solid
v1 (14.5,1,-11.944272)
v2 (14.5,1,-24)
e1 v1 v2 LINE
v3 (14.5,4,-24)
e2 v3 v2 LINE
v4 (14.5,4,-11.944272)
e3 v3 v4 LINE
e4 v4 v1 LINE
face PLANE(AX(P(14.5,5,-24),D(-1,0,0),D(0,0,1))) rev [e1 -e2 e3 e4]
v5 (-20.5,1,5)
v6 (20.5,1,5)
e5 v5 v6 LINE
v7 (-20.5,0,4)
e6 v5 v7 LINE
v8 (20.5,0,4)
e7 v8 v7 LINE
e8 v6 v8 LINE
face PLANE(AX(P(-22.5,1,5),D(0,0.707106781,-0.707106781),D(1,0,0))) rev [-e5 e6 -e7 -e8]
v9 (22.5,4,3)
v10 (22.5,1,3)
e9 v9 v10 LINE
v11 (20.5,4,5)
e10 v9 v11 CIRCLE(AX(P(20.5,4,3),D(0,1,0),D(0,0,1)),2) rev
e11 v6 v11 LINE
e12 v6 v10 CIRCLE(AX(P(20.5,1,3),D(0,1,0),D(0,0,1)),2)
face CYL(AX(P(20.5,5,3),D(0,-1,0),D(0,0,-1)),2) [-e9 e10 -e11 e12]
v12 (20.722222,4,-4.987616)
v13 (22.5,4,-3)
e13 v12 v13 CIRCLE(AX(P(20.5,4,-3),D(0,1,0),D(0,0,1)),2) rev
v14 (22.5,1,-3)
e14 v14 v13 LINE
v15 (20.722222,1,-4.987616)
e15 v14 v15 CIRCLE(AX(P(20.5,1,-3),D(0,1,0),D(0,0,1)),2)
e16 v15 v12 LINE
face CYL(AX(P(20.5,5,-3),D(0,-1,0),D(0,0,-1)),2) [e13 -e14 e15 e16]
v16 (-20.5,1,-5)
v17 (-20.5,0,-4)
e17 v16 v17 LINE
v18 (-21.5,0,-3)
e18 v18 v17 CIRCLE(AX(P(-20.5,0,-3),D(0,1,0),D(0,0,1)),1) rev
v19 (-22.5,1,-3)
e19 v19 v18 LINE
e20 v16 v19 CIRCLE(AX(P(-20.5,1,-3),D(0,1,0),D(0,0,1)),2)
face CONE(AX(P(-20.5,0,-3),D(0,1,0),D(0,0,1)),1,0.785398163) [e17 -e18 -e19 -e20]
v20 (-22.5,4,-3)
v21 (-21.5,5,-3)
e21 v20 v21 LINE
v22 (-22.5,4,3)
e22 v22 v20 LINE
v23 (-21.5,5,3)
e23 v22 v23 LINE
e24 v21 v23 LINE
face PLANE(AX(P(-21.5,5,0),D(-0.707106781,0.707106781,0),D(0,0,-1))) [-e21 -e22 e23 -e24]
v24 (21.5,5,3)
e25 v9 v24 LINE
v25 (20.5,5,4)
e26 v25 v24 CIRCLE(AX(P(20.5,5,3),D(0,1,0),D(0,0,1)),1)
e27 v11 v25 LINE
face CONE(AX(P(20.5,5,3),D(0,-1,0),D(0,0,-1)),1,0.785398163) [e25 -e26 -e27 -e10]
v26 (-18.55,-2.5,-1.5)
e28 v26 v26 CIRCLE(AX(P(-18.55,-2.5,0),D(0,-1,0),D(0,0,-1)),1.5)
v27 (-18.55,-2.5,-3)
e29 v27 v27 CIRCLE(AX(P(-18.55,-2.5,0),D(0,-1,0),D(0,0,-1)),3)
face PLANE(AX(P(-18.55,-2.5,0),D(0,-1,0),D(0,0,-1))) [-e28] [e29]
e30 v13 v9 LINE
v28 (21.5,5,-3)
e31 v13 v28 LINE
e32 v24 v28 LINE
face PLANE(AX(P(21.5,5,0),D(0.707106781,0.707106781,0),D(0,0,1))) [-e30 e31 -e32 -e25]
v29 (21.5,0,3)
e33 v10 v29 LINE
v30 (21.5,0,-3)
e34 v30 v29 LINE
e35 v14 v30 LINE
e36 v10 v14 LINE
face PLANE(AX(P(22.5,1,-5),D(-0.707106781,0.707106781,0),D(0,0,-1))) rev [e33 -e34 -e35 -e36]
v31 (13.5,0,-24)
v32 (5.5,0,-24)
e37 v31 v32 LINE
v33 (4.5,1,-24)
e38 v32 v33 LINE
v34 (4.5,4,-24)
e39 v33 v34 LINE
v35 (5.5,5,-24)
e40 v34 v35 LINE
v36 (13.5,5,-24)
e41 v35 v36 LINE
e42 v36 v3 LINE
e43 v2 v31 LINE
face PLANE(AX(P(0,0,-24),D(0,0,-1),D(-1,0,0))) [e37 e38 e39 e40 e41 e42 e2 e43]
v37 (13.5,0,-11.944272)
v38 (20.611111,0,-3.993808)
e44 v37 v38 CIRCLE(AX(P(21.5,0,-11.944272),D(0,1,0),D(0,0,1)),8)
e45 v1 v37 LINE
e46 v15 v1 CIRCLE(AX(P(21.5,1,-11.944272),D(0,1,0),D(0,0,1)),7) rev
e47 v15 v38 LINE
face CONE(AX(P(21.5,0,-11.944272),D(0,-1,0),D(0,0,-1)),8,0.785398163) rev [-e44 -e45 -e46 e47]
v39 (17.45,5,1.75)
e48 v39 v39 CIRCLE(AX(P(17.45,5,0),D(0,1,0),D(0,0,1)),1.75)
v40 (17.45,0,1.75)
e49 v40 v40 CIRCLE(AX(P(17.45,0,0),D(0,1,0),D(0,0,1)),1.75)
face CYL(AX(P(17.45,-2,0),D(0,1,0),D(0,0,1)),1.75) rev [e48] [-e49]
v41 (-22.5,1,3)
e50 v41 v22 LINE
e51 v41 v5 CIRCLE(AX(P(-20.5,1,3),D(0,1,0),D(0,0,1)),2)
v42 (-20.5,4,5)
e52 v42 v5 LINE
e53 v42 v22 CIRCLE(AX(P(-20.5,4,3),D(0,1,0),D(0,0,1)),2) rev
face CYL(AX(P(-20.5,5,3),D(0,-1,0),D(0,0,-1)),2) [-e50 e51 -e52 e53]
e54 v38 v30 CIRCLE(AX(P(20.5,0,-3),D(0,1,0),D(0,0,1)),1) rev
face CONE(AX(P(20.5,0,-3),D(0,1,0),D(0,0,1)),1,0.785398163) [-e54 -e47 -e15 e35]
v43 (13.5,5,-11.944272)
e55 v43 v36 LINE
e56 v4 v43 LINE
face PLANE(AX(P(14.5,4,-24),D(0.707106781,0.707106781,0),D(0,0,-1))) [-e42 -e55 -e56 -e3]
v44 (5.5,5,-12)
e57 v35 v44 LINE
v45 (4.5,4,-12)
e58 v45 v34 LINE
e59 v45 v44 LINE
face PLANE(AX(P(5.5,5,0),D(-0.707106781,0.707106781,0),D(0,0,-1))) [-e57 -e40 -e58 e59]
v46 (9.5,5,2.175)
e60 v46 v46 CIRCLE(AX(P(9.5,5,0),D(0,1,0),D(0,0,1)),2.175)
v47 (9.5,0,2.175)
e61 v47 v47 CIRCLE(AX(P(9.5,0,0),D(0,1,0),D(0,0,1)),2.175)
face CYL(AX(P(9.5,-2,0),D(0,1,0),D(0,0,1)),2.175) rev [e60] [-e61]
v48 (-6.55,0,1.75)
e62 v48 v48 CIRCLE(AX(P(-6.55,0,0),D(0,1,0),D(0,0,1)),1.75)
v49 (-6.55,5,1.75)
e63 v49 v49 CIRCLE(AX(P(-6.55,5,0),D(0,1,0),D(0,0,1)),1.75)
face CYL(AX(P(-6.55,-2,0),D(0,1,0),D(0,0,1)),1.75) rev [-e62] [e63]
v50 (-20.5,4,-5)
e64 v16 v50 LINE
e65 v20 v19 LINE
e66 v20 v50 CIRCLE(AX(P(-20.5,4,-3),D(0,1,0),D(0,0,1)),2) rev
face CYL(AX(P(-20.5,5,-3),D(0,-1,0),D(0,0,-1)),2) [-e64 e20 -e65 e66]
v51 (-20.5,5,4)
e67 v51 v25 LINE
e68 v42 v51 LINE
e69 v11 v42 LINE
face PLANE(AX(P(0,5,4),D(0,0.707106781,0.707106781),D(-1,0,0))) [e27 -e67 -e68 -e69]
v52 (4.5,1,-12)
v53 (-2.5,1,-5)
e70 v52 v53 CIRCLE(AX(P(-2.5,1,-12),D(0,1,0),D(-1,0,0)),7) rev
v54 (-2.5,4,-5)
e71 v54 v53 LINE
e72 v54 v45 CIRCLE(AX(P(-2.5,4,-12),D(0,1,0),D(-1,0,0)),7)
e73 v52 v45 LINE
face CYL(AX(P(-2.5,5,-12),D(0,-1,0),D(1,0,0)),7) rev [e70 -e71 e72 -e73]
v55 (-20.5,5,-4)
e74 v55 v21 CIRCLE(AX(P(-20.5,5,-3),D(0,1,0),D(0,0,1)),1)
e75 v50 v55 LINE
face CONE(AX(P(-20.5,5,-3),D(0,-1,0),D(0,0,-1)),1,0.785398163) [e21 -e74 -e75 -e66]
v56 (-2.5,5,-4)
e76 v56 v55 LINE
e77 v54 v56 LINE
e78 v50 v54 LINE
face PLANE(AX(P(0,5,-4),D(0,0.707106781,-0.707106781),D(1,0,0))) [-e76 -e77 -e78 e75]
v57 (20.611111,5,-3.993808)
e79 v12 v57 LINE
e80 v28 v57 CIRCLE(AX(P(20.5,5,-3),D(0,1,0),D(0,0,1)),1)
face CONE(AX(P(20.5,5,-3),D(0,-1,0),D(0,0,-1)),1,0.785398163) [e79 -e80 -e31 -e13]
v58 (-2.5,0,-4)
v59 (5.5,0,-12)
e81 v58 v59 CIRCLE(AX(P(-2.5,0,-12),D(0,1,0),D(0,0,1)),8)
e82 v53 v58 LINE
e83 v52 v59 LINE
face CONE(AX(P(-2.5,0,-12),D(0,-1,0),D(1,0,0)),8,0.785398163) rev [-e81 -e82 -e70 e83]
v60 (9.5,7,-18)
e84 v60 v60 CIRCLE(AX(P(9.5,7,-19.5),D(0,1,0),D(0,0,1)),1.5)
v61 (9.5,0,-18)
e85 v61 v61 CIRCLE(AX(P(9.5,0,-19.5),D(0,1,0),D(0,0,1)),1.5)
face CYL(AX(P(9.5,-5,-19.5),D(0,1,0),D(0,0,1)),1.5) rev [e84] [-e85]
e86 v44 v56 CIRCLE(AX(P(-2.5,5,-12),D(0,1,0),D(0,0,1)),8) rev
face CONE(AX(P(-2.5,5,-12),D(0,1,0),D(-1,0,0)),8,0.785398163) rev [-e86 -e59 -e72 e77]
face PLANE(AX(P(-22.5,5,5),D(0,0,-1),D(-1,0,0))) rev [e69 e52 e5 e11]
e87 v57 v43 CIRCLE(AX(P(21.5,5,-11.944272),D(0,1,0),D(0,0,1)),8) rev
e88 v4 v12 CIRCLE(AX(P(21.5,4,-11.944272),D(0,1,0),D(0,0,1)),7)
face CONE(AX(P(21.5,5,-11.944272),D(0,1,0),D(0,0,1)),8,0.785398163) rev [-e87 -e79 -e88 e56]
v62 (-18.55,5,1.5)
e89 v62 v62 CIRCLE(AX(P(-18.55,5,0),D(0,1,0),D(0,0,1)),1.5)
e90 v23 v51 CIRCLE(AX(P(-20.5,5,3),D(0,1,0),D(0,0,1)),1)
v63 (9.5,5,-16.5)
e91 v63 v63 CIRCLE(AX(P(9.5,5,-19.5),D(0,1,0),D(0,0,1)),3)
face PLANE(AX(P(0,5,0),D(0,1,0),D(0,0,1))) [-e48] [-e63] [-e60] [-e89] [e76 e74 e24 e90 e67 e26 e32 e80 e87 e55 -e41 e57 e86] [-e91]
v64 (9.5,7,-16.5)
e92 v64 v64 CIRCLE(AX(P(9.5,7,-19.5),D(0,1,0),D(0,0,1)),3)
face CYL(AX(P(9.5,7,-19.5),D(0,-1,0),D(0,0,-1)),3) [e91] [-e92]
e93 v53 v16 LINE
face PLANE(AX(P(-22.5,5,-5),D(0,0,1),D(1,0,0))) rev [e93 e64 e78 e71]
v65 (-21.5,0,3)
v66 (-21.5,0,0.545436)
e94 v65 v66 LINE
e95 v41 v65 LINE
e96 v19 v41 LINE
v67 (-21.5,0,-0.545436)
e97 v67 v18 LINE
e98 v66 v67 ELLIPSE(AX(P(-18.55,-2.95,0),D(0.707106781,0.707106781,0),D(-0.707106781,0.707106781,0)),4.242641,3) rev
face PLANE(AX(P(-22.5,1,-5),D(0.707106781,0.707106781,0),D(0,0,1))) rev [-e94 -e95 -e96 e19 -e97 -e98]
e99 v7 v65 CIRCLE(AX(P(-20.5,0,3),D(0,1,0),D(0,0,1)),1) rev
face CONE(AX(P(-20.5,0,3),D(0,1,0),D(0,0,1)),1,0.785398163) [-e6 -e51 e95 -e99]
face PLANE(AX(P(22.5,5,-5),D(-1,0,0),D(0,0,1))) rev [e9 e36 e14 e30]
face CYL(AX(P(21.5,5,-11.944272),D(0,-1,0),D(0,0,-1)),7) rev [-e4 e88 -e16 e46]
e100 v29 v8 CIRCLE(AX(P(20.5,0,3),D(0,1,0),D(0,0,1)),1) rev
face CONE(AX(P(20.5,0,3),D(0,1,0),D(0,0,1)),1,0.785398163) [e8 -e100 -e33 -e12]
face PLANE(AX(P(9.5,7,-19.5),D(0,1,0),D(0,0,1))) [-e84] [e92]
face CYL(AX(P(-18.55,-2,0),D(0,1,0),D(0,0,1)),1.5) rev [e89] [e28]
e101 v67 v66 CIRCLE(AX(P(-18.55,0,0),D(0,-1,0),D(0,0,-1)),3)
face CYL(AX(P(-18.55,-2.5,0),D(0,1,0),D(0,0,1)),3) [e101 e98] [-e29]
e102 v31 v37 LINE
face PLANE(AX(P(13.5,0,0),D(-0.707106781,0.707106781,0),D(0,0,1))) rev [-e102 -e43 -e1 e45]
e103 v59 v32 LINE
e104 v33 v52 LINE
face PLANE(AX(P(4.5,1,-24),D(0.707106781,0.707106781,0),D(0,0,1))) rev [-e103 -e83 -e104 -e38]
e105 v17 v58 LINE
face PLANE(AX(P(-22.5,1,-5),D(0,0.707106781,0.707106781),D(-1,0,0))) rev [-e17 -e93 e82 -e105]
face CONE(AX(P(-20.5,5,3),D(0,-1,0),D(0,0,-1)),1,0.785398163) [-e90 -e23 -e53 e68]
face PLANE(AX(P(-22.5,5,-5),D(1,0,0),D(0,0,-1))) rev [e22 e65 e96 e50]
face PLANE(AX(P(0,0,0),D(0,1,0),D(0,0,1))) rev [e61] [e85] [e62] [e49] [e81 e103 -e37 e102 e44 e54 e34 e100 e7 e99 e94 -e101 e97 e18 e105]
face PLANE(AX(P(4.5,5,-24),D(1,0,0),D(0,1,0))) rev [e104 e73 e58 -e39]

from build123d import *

# Parameters (mm, degrees)
SKETCH1_W           = 45
SKETCH1_H           = 10
BOSS_EXTRUDE1_DEPTH = 5
SKETCH3_R           = 1.5
SKETCH3_R_2         = 2.175
SKETCH3_R_3         = 1.75
CUT_EXTRUDE1_DEPTH  = 7
FILLET1_R           = 2
SKETCH4_R           = 3
SKETCH4_R_2         = 1.5
BOSS_EXTRUDE2_DEPTH = 2.5
SKETCH5_W           = 10
SKETCH5_H           = 5
BOSS_EXTRUDE3_DEPTH = 19
SKETCH6_R           = 1.5
CUT_EXTRUDE2_DEPTH  = 10
BOSS_EXTRUDE4_START = 2
SKETCH7_R           = 3
SKETCH7_R_2         = 1.5
BOSS_EXTRUDE4_DEPTH = 2
FILLET2_R           = 7
CHAMFER1_SIZE       = 1


with BuildPart() as part:
    # Sketch1 → Boss-Extrude1 (new body)
    with BuildSketch(Plane(origin=(0, 0, 0), x_dir=(1, 0, 0), z_dir=(0, 1, 0))):
        Rectangle(SKETCH1_W, SKETCH1_H)
    extrude(amount=BOSS_EXTRUDE1_DEPTH)

    # Sketch3 → Cut-Extrude1 (cut)
    with BuildSketch(Plane(origin=(0, 5, 0), x_dir=(1, 0, 0), z_dir=(0, 1, 0))):
        with Locations(Location((-18.55, 0, 0), (0, 0, 270))):
            Circle(SKETCH3_R)
        with Locations(Location((9.5, 0, 0), (0, 0, 270))):
            Circle(SKETCH3_R_2)
        with Locations(Location((-6.55, 0, 0), (0, 0, 270))):
            Circle(SKETCH3_R_3)
        with Locations(Location((17.45, 0, 0), (0, 0, 270))):
            Circle(SKETCH3_R_3)
    extrude(amount=-CUT_EXTRUDE1_DEPTH, mode=Mode.SUBTRACT)

    # Fillet1
    fillet1_edges = [part.edges().sort_by_distance(p)[0] for p in [
        (22.5, 2.5, 5),
        (-22.5, 2.5, 5),
        (-22.5, 2.5, -5),
        (22.5, 2.5, -5),
    ]]
    fillet(fillet1_edges, radius=FILLET1_R)

    # Sketch4 → Boss-Extrude2 (add)
    with BuildSketch(Plane.XZ):
        with Locations(Location((-18.55, 0, 0), (0, 0, 270))):
            Circle(SKETCH4_R)
        with Locations(Location((-18.55, 0, 0), (0, 0, 90))):
            Circle(SKETCH4_R_2, mode=Mode.SUBTRACT)
    extrude(amount=BOSS_EXTRUDE2_DEPTH)

    # Sketch5 → Boss-Extrude3 (add)
    with BuildSketch(Plane(origin=(0, 0, -5), x_dir=(-1, 0, 0), z_dir=(0, 0, -1))):
        with Locations((-9.5, 2.5)):
            Rectangle(SKETCH5_W, SKETCH5_H)
    extrude(amount=BOSS_EXTRUDE3_DEPTH)

    # Sketch6 → Cut-Extrude2 (cut)
    with BuildSketch(Plane(origin=(0, 5, 0), x_dir=(1, 0, 0), z_dir=(0, 1, 0))):
        with Locations(Location((9.5, 19.5, 0), (0, 0, 270))):
            Circle(SKETCH6_R)
    extrude(amount=-CUT_EXTRUDE2_DEPTH, mode=Mode.SUBTRACT)

    # Sketch7 → Boss-Extrude4 (add)
    with BuildSketch(Plane(origin=(0, 5, 0), x_dir=(1, 0, 0), z_dir=(0, 1, 0)).offset(BOSS_EXTRUDE4_START)):
        with Locations(Location((9.5, 19.5, 0), (0, 0, 270))):
            Circle(SKETCH7_R)
        with Locations(Location((9.5, 19.5, 0), (0, 0, 270))):
            Circle(SKETCH7_R_2, mode=Mode.SUBTRACT)
    extrude(amount=-BOSS_EXTRUDE4_DEPTH)

    # Fillet2
    fillet2_edges = [part.edges().sort_by_distance(p)[0] for p in [
        (4.5, 2.5, -5),
        (14.5, 2.5, -5),
    ]]
    fillet(fillet2_edges, radius=FILLET2_R)

    # Chamfer1
    # the kernel refuses this chamfer: 1 mm, written as the material it takes off along each edge
    with BuildSketch(Plane(origin=(-20.5, 0, -5), x_dir=(0, 1, 0), z_dir=(1, 0, 0))) as chamfer1_piece_1:
        Polygon((CHAMFER1_SIZE, 0), (0, CHAMFER1_SIZE), (0, 0), align=None)
    extrude(amount=18, mode=Mode.SUBTRACT)
    with BuildSketch(Plane(origin=(-20.5, 5, -5), x_dir=(0, -1, 0), z_dir=(1, 0, 0))) as chamfer1_piece_2:
        Polygon((CHAMFER1_SIZE, 0), (0, -CHAMFER1_SIZE), (0, 0), align=None)
    extrude(amount=18, mode=Mode.SUBTRACT)
    with BuildSketch(Plane(origin=(20.5, 0, -3), x_dir=(0.11111111111111072, 0, -0.9938079899999066), z_dir=(-0.9938079899999066, 0, -0.11111111111111072))) as chamfer1_piece_3:
        Polygon((2 - CHAMFER1_SIZE, 0), (2, -CHAMFER1_SIZE), (2, 0), align=None)
    revolve(axis=Axis((20.5, 0, -3), (0, -1, 0)), revolution_arc=83.620629792, mode=Mode.SUBTRACT)
    with BuildSketch(Plane(origin=(-2.5, 5, -12), x_dir=(0, 0, 1), z_dir=(-1, 0, 0))) as chamfer1_piece_4:
        Polygon((7, -CHAMFER1_SIZE), (7 + CHAMFER1_SIZE, 0), (7, 0), align=None)
    revolve(axis=Axis((-2.5, 5, -12), (0, 1, 0)), revolution_arc=90, mode=Mode.SUBTRACT)
    with BuildSketch(Plane(origin=(-2.5, 0, -12), x_dir=(0, 0, 1), z_dir=(-1, 0, 0))) as chamfer1_piece_5:
        Polygon((7 + CHAMFER1_SIZE, 0), (7, CHAMFER1_SIZE), (7, 0), align=None)
    revolve(axis=Axis((-2.5, 0, -12), (0, 1, 0)), revolution_arc=90, mode=Mode.SUBTRACT)
    with BuildSketch(Plane(origin=(21.499999975, 0, -11.944271843), x_dir=(-0.11111110870133047, 0, 0.9938079902693282), z_dir=(0.9938079902693282, 0, 0.11111110870133047))) as chamfer1_piece_6:
        Polygon((6.999999931 + CHAMFER1_SIZE, 0), (6.999999931 + CHAMFER1_SIZE * 6.29164365051e-09, -CHAMFER1_SIZE), (6.999999931, 0), align=None)
    revolve(axis=Axis((21.499999975, 0, -11.944271843), (0, -1, 0)), revolution_arc=83.620630478, mode=Mode.SUBTRACT)
    with BuildSketch(Plane(origin=(21.499999975, 5, -11.944271843), x_dir=(-0.11111110870132958, 0, 0.9938079902693283), z_dir=(0.9938079902693283, 0, 0.11111110870132958))) as chamfer1_piece_7:
        Polygon((6.999999931 + CHAMFER1_SIZE, 0), (6.999999931 + CHAMFER1_SIZE * 6.2916400978e-09, CHAMFER1_SIZE), (6.999999931, 0), align=None)
    revolve(axis=Axis((21.499999975, 5, -11.944271843), (0, -1, 0)), revolution_arc=83.620630478, mode=Mode.SUBTRACT)
    with BuildSketch(Plane(origin=(22.5, 0, -3), x_dir=(-1, 0, 0), z_dir=(0, 0, 1))) as chamfer1_piece_8:
        Polygon((CHAMFER1_SIZE, 0), (0, -CHAMFER1_SIZE), (0, 0), align=None)
    extrude(amount=6, mode=Mode.SUBTRACT)
    with BuildSketch(Plane(origin=(20.5, 0, 5), x_dir=(0, 0, -1), z_dir=(-1, 0, 0))) as chamfer1_piece_9:
        Polygon((CHAMFER1_SIZE, 0), (0, -CHAMFER1_SIZE), (0, 0), align=None)
    extrude(amount=41, mode=Mode.SUBTRACT)
    with BuildSketch(Plane(origin=(-22.5, 0, 3), x_dir=(1, 0, 0), z_dir=(0, 0, -1))) as chamfer1_piece_10_section:
        Polygon((CHAMFER1_SIZE, 0), (0, -CHAMFER1_SIZE), (0, 0), align=None)
    chamfer1_piece_10 = extrude(amount=6, mode=Mode.PRIVATE)
    chamfer1_piece_10 = chamfer1_piece_10 - Plane(origin=(-18.55, 0, 0), x_dir=(0, 0, -1), z_dir=(0, 1, 0)) * Cylinder(3, 16, mode=Mode.PRIVATE)
    add(chamfer1_piece_10, mode=Mode.SUBTRACT)
    with BuildSketch(Plane(origin=(-20.5, 0, 3), x_dir=(-1, 0, 0), z_dir=(0, 0, -1))) as chamfer1_piece_11:
        Polygon((2 - CHAMFER1_SIZE, 0), (2, CHAMFER1_SIZE), (2, 0), align=None)
    revolve(axis=Axis((-20.5, 0, 3), (0, 1, 0)), revolution_arc=90, mode=Mode.SUBTRACT)
    with BuildSketch(Plane(origin=(20.5, 0, 3), x_dir=(1, 0, 0), z_dir=(0, 0, -1))) as chamfer1_piece_12:
        Polygon((2 - CHAMFER1_SIZE, 0), (2, -CHAMFER1_SIZE), (2, 0), align=None)
    revolve(axis=Axis((20.5, 0, 3), (0, -1, 0)), revolution_arc=90, mode=Mode.SUBTRACT)
    with BuildSketch(Plane(origin=(-20.5, 0, -3), x_dir=(0, 0, -1), z_dir=(1, 0, 0))) as chamfer1_piece_13:
        Polygon((2 - CHAMFER1_SIZE, 0), (2, CHAMFER1_SIZE), (2, 0), align=None)
    revolve(axis=Axis((-20.5, 0, -3), (0, 1, 0)), revolution_arc=90, mode=Mode.SUBTRACT)
    with BuildSketch(Plane(origin=(22.5, 5, -3), x_dir=(-1, 0, 0), z_dir=(0, 0, 1)), Plane(origin=(-22.5, 5, 3), x_dir=(1, 0, 0), z_dir=(0, 0, -1))) as chamfer1_piece_14:
        Polygon((CHAMFER1_SIZE, 0), (0, CHAMFER1_SIZE), (0, 0), align=None)
    extrude(amount=6, mode=Mode.SUBTRACT)
    with BuildSketch(Plane(origin=(20.5, 5, 5), x_dir=(0, 0, -1), z_dir=(-1, 0, 0))) as chamfer1_piece_15:
        Polygon((CHAMFER1_SIZE, 0), (0, CHAMFER1_SIZE), (0, 0), align=None)
    extrude(amount=41, mode=Mode.SUBTRACT)
    with BuildSketch(Plane(origin=(-20.5, 5, 3), x_dir=(-1, 0, 0), z_dir=(0, 0, -1))) as chamfer1_piece_16:
        Polygon((2 - CHAMFER1_SIZE, 0), (2, -CHAMFER1_SIZE), (2, 0), align=None)
    revolve(axis=Axis((-20.5, 5, 3), (0, 1, 0)), revolution_arc=90, mode=Mode.SUBTRACT)
    with BuildSketch(Plane(origin=(20.5, 5, 3), x_dir=(1, 0, 0), z_dir=(0, 0, -1))) as chamfer1_piece_17:
        Polygon((2 - CHAMFER1_SIZE, 0), (2, CHAMFER1_SIZE), (2, 0), align=None)
    revolve(axis=Axis((20.5, 5, 3), (0, -1, 0)), revolution_arc=90, mode=Mode.SUBTRACT)
    with BuildSketch(Plane(origin=(-20.5, 5, -3), x_dir=(0, 0, -1), z_dir=(1, 0, 0))) as chamfer1_piece_18:
        Polygon((2, -CHAMFER1_SIZE), (2 - CHAMFER1_SIZE, 0), (2, 0), align=None)
    revolve(axis=Axis((-20.5, 5, -3), (0, 1, 0)), revolution_arc=90, mode=Mode.SUBTRACT)
    with BuildSketch(Plane(origin=(20.5, 5, -3), x_dir=(0.11111111111111072, 0, -0.9938079899999066), z_dir=(-0.9938079899999066, 0, -0.11111111111111072))) as chamfer1_piece_19:
        Polygon((2 - CHAMFER1_SIZE, 0), (2, CHAMFER1_SIZE), (2, 0), align=None)
    revolve(axis=Axis((20.5, 5, -3), (0, -1, 0)), revolution_arc=83.620629792, mode=Mode.SUBTRACT)
    with BuildSketch(Plane(origin=(14.5, 5, -11.94427191), x_dir=(-1, 0, 0), z_dir=(0, 0, -1))) as chamfer1_piece_20:
        Polygon((CHAMFER1_SIZE, 0), (0, -CHAMFER1_SIZE), (0, 0), align=None)
    extrude(amount=14.627411078, mode=Mode.SUBTRACT)
    with BuildSketch(Plane(origin=(14.5, 0, -11.94427191), x_dir=(-1, 0, 0), z_dir=(0, 0, -1))) as chamfer1_piece_21:
        Polygon((CHAMFER1_SIZE, 0), (0, CHAMFER1_SIZE), (0, 0), align=None)
    extrude(amount=14.627411078, mode=Mode.SUBTRACT)
    with BuildSketch(Plane(origin=(4.5, 0, -12), x_dir=(1, 0, 0), z_dir=(0, 0, -1))) as chamfer1_piece_22:
        Polygon((CHAMFER1_SIZE, 0), (0, -CHAMFER1_SIZE), (0, 0), align=None)
    extrude(amount=14.571682988, mode=Mode.SUBTRACT)
    with BuildSketch(Plane(origin=(4.5, 5, -12), x_dir=(1, 0, 0), z_dir=(0, 0, -1))) as chamfer1_piece_23:
        Polygon((CHAMFER1_SIZE, 0), (0, CHAMFER1_SIZE), (0, 0), align=None)
    extrude(amount=14.571682988, mode=Mode.SUBTRACT)


solid = part.part
